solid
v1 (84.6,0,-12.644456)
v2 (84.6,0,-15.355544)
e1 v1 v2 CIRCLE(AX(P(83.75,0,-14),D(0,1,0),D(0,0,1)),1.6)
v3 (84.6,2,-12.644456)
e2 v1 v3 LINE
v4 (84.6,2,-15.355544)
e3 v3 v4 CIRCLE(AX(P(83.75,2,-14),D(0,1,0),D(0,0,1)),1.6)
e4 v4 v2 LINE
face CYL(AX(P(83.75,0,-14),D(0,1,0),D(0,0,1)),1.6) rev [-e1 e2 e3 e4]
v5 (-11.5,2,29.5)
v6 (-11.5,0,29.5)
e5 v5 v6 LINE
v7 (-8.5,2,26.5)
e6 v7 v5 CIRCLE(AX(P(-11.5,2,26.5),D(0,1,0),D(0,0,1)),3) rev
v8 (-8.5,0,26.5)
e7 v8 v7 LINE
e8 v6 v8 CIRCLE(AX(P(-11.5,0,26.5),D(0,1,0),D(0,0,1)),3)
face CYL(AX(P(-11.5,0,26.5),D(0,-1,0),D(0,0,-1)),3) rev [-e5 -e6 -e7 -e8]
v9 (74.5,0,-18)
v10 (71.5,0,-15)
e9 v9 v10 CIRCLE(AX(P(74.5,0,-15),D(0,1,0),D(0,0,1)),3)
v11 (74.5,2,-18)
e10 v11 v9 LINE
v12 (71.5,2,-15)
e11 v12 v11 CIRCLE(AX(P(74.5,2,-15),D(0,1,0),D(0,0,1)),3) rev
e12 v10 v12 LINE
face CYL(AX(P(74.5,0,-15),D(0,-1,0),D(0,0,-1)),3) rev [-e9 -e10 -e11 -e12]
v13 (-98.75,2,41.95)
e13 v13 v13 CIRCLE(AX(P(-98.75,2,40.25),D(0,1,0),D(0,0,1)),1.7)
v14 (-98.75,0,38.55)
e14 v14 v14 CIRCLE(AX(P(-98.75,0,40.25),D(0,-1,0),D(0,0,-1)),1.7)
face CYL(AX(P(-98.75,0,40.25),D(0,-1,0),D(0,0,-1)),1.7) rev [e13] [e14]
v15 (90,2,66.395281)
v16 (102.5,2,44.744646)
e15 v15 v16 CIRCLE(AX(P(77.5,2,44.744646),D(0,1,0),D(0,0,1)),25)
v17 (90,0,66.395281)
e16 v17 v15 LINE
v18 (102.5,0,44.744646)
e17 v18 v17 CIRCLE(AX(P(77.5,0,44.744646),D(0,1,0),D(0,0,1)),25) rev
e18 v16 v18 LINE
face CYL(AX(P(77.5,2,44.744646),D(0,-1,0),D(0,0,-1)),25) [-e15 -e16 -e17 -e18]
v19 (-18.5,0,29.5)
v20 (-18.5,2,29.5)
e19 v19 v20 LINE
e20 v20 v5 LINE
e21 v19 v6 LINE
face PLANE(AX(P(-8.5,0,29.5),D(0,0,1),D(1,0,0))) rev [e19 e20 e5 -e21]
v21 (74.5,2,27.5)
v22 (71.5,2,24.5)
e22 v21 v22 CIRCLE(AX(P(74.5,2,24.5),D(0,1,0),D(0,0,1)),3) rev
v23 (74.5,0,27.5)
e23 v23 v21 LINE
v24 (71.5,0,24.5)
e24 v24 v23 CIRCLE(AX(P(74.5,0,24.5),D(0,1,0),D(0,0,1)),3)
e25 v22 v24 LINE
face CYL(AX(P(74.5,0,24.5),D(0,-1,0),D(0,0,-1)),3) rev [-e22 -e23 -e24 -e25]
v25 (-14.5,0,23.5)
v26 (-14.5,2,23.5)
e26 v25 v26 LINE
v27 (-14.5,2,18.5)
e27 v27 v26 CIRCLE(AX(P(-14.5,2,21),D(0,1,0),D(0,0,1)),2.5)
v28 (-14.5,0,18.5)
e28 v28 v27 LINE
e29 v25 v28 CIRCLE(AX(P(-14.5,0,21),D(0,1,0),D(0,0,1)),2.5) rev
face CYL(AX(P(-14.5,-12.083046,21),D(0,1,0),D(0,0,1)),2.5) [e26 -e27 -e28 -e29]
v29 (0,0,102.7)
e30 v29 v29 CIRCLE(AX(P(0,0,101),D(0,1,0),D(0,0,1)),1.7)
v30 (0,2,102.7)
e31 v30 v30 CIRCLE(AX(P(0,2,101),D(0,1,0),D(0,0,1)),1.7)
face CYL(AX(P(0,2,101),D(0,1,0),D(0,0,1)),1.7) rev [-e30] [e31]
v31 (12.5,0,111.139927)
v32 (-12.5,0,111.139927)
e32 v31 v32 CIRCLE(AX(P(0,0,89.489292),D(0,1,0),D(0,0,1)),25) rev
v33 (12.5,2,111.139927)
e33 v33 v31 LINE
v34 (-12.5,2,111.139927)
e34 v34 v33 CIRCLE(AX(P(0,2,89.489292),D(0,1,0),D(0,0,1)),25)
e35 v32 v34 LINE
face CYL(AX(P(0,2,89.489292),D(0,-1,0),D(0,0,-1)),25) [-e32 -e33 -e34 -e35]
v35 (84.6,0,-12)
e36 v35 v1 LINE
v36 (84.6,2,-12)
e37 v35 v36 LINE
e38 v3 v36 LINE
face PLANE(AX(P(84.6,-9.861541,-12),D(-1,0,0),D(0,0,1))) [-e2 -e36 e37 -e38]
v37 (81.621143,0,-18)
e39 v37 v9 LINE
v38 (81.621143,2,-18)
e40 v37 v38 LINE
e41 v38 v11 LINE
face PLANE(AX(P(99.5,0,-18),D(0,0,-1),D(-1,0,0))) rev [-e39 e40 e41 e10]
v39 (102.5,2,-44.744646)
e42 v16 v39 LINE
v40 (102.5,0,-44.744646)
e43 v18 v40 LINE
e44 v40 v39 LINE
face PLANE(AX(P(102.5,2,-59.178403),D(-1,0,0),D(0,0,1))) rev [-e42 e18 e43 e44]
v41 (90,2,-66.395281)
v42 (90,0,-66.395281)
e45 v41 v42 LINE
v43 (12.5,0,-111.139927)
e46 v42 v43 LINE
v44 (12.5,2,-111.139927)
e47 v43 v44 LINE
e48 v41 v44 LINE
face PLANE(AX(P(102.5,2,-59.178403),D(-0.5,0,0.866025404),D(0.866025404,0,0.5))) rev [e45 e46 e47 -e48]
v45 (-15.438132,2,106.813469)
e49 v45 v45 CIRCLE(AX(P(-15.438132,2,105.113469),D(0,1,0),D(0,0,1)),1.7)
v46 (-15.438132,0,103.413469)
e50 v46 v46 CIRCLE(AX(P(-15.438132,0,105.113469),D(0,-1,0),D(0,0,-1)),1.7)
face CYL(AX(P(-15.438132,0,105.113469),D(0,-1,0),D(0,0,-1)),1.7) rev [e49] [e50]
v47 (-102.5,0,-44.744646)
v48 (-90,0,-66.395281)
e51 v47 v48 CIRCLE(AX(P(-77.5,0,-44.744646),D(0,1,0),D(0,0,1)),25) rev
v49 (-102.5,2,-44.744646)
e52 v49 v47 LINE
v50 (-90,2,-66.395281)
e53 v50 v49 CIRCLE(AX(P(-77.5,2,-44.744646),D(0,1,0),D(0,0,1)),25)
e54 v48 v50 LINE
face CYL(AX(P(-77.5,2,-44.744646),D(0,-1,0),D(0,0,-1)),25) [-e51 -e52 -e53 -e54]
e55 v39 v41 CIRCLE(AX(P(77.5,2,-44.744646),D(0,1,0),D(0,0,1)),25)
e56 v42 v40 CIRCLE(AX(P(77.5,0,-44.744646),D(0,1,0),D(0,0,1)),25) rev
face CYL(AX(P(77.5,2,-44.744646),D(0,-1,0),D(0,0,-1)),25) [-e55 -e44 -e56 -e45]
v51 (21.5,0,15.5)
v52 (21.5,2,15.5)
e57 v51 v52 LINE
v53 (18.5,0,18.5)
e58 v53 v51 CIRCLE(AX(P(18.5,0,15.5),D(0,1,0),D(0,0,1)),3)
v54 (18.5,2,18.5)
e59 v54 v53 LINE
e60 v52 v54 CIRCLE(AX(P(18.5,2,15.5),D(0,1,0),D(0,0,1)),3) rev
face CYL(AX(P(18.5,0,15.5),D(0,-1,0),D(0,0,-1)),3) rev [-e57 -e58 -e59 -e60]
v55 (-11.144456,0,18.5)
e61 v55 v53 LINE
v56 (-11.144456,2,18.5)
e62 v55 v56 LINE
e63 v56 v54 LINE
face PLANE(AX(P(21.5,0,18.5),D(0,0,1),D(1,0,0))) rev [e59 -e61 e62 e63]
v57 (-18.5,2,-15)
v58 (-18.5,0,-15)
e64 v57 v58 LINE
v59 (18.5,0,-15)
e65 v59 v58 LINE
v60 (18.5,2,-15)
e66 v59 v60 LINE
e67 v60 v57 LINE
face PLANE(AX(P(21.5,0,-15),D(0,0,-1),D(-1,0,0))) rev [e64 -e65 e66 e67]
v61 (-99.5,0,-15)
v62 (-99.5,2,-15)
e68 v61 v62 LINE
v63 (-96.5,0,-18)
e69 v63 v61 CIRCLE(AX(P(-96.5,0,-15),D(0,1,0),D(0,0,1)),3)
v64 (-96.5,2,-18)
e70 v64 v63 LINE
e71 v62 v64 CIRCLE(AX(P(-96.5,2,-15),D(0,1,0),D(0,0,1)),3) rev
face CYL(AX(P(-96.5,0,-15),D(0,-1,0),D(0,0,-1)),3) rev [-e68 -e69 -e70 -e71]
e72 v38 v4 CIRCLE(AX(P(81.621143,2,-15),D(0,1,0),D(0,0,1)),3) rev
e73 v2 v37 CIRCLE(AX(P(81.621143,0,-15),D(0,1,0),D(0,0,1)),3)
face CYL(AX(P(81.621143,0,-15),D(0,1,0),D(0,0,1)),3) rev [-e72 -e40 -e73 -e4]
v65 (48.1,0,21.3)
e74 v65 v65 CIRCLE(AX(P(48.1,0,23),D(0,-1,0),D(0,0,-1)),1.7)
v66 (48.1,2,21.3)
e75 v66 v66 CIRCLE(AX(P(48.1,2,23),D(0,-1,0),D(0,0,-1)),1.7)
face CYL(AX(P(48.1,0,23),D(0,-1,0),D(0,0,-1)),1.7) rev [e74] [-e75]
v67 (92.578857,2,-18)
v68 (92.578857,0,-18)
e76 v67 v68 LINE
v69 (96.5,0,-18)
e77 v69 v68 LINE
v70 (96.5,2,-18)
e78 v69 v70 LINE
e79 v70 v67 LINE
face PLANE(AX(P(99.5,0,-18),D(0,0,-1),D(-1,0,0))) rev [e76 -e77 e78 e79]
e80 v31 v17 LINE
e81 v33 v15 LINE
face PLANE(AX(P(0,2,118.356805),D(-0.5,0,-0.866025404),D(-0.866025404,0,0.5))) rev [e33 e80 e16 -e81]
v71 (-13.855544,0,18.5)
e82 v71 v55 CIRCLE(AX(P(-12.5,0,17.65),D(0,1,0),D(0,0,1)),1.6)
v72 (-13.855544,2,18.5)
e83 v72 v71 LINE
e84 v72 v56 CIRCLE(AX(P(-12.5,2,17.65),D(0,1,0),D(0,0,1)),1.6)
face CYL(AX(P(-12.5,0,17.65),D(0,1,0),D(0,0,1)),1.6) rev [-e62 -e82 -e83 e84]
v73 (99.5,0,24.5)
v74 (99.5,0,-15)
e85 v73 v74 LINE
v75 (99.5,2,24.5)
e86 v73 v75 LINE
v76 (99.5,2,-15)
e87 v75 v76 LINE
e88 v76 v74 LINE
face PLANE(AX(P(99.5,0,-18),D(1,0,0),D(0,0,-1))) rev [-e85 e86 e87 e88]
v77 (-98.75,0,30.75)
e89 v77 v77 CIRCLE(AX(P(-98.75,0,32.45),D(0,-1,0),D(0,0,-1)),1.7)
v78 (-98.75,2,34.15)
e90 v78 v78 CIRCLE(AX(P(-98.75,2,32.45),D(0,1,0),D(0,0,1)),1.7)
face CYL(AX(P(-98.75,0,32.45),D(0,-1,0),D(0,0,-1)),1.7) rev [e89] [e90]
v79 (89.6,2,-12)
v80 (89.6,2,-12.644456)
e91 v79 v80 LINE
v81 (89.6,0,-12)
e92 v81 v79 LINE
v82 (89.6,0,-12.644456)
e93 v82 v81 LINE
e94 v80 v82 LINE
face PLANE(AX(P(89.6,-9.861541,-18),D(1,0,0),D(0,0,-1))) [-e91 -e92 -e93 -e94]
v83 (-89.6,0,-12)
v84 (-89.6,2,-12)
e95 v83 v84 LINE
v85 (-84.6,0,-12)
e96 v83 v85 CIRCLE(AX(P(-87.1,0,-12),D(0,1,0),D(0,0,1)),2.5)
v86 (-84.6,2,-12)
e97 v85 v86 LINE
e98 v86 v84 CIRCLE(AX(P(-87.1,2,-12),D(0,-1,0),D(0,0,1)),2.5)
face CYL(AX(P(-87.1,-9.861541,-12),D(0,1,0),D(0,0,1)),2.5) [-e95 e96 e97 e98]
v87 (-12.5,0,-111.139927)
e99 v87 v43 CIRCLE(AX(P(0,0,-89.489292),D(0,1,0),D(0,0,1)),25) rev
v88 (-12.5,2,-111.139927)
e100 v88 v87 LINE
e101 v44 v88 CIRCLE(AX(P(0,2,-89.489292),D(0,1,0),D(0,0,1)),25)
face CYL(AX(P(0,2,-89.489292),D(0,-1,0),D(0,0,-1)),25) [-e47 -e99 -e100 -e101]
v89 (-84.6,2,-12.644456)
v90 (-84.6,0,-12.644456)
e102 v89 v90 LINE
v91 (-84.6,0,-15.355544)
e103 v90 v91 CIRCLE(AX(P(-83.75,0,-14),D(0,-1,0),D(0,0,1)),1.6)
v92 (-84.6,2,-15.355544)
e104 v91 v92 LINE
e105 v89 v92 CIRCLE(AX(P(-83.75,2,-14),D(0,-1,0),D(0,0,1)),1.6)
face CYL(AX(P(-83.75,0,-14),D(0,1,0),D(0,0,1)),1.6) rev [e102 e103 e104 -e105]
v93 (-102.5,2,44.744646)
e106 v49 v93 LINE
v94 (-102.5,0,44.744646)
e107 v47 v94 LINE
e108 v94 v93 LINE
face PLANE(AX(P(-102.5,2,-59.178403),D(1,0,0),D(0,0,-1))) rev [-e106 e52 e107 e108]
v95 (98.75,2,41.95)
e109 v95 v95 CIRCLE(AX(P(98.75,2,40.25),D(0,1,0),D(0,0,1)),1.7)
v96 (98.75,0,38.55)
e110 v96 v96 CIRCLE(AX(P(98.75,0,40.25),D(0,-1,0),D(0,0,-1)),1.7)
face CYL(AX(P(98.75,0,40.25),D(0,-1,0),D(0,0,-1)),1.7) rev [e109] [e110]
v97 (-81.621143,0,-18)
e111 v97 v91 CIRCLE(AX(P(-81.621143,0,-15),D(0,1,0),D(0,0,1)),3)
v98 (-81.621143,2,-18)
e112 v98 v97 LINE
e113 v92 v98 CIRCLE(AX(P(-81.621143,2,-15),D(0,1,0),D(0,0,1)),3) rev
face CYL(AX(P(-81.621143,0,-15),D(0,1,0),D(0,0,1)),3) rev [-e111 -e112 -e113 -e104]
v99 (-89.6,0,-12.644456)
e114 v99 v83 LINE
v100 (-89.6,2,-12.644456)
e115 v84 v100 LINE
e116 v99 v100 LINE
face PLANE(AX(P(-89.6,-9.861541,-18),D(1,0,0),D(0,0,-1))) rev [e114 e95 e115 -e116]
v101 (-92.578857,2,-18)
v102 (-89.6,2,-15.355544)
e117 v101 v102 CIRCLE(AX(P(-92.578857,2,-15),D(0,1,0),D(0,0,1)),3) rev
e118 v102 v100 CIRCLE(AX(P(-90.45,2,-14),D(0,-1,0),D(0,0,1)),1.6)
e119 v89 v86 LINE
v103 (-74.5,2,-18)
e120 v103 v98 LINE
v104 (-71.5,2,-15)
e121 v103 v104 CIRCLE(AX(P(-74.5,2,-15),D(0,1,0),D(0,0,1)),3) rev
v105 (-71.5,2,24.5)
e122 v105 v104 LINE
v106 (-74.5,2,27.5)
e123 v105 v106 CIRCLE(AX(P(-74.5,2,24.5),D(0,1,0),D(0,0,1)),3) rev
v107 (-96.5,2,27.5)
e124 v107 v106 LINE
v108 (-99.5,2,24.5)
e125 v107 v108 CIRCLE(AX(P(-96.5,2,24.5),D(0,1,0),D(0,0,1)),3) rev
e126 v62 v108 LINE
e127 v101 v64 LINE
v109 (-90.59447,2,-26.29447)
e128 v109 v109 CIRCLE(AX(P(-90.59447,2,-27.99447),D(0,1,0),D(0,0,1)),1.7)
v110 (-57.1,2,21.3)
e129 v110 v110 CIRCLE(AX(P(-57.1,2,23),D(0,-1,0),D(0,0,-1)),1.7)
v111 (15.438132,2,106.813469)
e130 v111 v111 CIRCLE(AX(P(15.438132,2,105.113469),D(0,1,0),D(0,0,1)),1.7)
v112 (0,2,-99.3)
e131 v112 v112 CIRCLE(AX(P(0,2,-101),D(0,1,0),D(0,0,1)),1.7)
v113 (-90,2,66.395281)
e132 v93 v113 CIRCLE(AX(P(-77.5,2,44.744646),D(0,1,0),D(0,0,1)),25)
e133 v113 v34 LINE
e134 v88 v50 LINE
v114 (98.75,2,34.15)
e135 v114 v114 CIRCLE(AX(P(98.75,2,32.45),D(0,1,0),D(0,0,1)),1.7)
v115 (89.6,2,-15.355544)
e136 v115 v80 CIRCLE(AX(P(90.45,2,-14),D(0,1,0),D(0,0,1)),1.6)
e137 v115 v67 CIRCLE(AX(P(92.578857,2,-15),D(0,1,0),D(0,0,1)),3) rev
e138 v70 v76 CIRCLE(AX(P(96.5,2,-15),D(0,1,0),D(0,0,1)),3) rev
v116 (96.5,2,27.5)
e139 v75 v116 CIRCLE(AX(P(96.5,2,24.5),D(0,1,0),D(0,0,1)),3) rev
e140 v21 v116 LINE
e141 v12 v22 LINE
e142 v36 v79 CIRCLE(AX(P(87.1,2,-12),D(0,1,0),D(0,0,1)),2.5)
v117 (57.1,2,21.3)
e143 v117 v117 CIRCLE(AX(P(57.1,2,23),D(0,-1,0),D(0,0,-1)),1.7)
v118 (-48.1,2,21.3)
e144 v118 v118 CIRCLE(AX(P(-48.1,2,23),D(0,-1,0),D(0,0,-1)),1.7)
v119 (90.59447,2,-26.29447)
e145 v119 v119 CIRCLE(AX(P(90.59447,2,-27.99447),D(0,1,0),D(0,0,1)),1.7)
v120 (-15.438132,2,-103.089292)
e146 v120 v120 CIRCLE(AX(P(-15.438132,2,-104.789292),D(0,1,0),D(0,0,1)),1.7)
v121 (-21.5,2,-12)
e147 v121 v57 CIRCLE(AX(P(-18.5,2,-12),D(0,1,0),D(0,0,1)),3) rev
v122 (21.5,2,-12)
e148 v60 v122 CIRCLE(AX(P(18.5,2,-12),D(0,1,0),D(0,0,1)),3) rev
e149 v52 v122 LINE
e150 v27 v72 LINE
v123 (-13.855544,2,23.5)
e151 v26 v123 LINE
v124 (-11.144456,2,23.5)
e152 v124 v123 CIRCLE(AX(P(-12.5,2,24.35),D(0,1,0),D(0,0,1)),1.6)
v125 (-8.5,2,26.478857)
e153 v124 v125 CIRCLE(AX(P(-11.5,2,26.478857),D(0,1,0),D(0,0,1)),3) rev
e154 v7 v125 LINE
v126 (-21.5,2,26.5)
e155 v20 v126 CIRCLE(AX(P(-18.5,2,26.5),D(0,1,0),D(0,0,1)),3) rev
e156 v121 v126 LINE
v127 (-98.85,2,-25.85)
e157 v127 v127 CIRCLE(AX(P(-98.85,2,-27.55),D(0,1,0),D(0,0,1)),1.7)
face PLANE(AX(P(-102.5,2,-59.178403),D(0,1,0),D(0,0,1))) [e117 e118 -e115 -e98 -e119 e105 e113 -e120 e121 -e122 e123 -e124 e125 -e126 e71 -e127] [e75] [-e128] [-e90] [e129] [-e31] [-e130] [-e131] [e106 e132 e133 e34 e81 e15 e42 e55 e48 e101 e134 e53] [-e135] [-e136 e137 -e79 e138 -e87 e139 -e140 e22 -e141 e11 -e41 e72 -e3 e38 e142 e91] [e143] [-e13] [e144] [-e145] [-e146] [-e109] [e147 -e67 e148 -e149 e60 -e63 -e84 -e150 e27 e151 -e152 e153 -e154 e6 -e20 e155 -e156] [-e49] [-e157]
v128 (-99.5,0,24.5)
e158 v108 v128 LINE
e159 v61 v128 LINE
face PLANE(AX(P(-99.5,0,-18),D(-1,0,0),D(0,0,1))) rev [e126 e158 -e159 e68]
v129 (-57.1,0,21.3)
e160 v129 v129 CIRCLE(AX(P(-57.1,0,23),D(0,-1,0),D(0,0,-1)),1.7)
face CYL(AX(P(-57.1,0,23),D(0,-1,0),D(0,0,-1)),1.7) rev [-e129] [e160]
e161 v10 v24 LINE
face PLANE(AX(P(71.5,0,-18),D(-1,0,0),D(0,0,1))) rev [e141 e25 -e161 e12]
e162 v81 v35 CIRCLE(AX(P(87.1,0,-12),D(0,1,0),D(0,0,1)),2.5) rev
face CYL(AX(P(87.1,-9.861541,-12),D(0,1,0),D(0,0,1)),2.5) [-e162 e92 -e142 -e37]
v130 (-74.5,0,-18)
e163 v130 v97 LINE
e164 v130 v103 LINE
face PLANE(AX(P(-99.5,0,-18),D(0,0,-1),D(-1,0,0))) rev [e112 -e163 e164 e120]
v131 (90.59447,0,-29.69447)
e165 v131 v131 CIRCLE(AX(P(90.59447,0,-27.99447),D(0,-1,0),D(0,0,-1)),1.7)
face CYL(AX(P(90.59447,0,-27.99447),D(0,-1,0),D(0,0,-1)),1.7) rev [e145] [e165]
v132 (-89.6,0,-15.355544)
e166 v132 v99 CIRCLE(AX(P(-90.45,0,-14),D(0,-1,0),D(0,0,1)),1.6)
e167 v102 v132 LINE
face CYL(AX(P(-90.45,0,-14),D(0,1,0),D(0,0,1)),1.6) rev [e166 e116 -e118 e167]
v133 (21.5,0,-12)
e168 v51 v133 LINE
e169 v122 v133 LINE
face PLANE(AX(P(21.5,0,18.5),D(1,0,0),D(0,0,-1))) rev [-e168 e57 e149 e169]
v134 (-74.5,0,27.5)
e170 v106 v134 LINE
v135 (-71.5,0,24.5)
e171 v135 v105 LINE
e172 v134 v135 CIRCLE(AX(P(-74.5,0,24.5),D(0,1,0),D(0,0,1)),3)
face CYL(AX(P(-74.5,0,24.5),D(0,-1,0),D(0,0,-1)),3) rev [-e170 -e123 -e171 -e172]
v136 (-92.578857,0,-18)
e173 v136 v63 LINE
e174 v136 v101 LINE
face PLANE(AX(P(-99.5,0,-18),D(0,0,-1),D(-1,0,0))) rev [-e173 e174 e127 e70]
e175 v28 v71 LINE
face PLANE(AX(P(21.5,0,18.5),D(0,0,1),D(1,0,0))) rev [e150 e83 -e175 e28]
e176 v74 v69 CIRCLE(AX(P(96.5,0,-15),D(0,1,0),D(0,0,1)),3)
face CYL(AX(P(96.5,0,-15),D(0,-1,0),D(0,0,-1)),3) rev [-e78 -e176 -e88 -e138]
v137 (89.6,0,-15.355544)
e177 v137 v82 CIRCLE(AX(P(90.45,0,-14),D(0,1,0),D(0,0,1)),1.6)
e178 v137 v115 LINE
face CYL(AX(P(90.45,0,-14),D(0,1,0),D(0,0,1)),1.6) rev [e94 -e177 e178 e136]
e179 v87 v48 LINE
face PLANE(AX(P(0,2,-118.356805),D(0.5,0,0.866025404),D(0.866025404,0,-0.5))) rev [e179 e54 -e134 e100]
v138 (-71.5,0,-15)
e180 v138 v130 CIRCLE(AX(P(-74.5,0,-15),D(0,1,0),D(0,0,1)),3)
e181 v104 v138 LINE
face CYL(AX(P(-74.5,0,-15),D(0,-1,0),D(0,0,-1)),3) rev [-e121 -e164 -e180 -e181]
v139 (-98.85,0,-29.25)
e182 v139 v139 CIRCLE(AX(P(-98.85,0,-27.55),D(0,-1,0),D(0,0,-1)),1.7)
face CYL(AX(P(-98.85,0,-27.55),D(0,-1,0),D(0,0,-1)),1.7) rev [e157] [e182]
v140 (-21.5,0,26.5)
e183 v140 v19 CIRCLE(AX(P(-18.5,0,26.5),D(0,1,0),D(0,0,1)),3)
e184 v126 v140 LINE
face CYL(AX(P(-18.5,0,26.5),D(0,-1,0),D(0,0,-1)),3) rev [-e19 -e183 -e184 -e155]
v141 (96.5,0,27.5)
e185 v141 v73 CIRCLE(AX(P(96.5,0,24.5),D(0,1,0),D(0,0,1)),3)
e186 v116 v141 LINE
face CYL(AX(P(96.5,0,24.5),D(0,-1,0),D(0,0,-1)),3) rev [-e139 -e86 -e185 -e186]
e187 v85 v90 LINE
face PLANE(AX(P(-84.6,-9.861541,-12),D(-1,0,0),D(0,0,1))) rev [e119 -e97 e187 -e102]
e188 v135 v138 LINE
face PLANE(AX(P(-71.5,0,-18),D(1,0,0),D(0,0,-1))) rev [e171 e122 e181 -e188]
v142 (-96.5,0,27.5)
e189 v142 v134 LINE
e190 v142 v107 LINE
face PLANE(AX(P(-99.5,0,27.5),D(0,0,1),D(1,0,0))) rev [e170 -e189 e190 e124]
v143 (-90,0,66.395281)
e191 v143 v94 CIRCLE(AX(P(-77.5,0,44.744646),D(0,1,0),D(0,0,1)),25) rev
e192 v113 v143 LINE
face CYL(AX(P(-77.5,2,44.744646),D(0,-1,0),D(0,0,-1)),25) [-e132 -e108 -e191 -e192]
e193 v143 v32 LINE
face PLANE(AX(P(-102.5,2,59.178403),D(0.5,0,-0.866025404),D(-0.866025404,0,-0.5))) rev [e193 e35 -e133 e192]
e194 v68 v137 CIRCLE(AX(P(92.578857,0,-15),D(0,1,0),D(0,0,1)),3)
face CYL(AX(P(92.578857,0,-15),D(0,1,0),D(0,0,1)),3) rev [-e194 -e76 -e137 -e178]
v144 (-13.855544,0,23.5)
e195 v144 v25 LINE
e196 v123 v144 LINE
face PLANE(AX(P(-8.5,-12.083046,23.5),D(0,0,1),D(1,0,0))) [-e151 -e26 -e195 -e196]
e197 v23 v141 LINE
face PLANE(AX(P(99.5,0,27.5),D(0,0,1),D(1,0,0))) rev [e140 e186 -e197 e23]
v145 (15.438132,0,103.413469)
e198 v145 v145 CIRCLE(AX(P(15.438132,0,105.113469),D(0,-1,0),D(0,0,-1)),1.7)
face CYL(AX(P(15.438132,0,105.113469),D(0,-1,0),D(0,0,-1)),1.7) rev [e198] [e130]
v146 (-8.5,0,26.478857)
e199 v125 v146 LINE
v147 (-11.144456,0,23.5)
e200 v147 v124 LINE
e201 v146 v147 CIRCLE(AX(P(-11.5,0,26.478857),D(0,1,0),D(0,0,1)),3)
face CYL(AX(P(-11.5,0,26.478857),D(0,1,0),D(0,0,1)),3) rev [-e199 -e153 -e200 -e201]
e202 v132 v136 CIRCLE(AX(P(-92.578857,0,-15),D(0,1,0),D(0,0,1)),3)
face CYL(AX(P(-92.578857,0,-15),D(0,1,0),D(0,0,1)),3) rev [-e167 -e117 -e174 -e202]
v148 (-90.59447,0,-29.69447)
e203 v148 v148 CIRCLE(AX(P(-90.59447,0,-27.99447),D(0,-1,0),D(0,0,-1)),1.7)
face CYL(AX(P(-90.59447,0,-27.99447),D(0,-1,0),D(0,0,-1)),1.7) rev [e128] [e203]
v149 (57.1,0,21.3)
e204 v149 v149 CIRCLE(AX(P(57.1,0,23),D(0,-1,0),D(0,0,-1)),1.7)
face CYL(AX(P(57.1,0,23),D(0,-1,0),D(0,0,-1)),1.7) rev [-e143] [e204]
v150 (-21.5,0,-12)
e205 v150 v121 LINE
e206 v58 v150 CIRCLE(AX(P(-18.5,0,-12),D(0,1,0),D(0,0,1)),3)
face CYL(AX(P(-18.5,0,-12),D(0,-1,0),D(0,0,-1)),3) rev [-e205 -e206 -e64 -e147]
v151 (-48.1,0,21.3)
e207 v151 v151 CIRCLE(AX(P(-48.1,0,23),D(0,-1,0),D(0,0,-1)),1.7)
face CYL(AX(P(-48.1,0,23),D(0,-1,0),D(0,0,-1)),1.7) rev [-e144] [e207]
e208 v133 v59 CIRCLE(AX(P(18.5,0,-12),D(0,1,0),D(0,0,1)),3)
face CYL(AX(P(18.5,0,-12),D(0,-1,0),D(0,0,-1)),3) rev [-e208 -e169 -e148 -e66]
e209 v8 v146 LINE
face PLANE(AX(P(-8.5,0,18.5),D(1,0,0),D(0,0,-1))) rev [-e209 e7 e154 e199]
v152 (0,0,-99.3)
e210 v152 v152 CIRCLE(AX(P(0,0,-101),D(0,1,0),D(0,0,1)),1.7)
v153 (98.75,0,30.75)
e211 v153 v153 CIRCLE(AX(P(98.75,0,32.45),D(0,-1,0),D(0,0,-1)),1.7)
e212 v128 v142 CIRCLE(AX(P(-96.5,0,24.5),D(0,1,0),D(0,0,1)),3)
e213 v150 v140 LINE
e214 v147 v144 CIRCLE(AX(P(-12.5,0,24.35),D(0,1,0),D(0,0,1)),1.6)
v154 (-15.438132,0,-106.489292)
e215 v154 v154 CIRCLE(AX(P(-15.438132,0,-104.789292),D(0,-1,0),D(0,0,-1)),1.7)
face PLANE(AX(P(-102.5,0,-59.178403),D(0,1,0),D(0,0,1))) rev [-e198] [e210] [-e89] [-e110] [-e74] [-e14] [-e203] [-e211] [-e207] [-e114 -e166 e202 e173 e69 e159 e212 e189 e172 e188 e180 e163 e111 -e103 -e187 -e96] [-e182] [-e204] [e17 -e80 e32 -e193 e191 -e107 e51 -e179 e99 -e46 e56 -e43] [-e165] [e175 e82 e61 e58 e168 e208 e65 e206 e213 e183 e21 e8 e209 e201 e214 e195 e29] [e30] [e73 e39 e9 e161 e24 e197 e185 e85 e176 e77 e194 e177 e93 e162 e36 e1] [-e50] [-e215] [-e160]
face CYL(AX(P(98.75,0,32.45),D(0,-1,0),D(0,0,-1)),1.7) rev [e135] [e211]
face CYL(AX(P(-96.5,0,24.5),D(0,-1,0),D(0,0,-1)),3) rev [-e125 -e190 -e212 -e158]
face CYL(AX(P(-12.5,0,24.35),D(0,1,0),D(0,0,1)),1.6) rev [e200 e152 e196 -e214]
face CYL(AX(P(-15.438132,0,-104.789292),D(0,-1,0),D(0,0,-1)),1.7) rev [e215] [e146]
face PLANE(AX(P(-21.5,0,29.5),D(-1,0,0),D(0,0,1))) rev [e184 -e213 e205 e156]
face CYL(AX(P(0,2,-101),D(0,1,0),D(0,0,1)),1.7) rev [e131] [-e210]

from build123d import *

# Parameters (mm, degrees)
BOSS_EXTRU_1_DEPTH                  = 2
ESQUISSE2_W                         = 28
ESQUISSE2_H                         = 45.5
ENL_V_MAT_EXTRU_1_DEPTH             = 157.584109453
BOSS_EXTRU_2_DEPTH                  = 2
ESQUISSE11_R                        = 1.6
ENL_V_MAT_EXTRU_2_DEPTH             = 157.584109453
CONG_7_R                            = 3
CONG_8_R                            = 25
DIAM_TRE_DU_PER_AGE_3_4_3_4_2_D     = 3.4
DIAM_TRE_DU_PER_AGE_3_4_3_4_2_DEPTH = 3
DIAM_TRE_DU_PER_AGE_3_4_3_4_2_TIP   = 1.021463052
D_GAGEMENT_M31_D                    = 3.4
D_GAGEMENT_M33_D                    = 3.4
D_GAGEMENT_M33_DEPTH                = 7
D_GAGEMENT_M33_TIP                  = 1.021463052
ENL_V_MAT_EXTRU_3_DEPTH             = 154.681644706
BOSS_EXTRU_3_DEPTH                  = 2
ESQUISSE40_R                        = 1.6
ENL_V_MAT_EXTRU_4_DEPTH             = 154.681644706
CONG_9_R                            = 3


with BuildPart() as part:
    # Esquisse1 → Boss.-Extru.1 (new body)
    with BuildSketch(Plane(origin=(0, 0, 0), x_dir=(1, 0, 0), z_dir=(0, 1, 0))):
        Polygon((-102.5, 59.178402592), (-102.5, -59.178402592), (0, -118.356805184), (102.5, -59.178402592), (102.5, 59.178402592), (0, 118.356805184), align=None)
    extrude(amount=BOSS_EXTRU_1_DEPTH)

    # Esquisse2 → Enlèv. mat.-Extru.1 (cut, through all)
    with BuildSketch(Plane(origin=(0, 2, 0), x_dir=(1, 0, 0), z_dir=(0, 1, 0))):
        with Locations((-85.5, -4.75)):
            Rectangle(ESQUISSE2_W, ESQUISSE2_H)
        with Locations((85.5, -4.75)):
            Rectangle(ESQUISSE2_W, ESQUISSE2_H)
    extrude(amount=-ENL_V_MAT_EXTRU_1_DEPTH, mode=Mode.SUBTRACT)

    # Esquisse10 → Boss.-Extru.2 (add)
    with BuildSketch(Plane(origin=(0, 2, 0), x_dir=(1, 0, 0), z_dir=(0, 1, 0))):
        with BuildLine():
            Line((89.6, 18), (89.6, 12))
            ThreePointArc((89.6, 12), (87.1, 9.5), (84.6, 12))
            Line((84.6, 12), (84.6, 18))
            Line((84.6, 18), (89.6, 18))
        make_face()
    boss_extru_2 = extrude(amount=-BOSS_EXTRU_2_DEPTH)

    # Esquisse11 → Enlèv. mat.-Extru.2 (cut, through all)
    with BuildSketch(Plane(origin=(0, 2, 0), x_dir=(1, 0, 0), z_dir=(0, 1, 0))):
        with Locations((83.75, 14)):
            Circle(ESQUISSE11_R)
        with Locations((90.45, 14)):
            Circle(ESQUISSE11_R)
    enl_v_mat_extru_2 = extrude(amount=-ENL_V_MAT_EXTRU_2_DEPTH, mode=Mode.SUBTRACT)

    # Symétrie4: Boss.-Extru.2, Enlèv. mat.-Extru.2 across plane
    add(boss_extru_2.mirror(Plane(origin=(0, 0, 0), x_dir=(0, 0, 1), z_dir=(1, 0, 0))))
    add(enl_v_mat_extru_2.mirror(Plane(origin=(0, 0, 0), x_dir=(0, 0, 1), z_dir=(1, 0, 0))), mode=Mode.SUBTRACT)

    # Congé7
    # the kernel refuses this fillet: 3 mm, written as the material it adds along each edge
    with BuildSketch(Plane(origin=(-89.6, 2, -18), x_dir=(0, 0, 1), z_dir=(0, -1, 0)), Plane(origin=(84.6, 2, -18), x_dir=(0, 0, 1), z_dir=(0, -1, 0))) as cong_7_piece_1:
        with BuildLine():
            CenterArc((3, 2.978856885), CONG_7_R, 180, 83.193609184)
            Line((0, 2.978856885), (-0.06, 2.978856885))
            Line((-0.06, 2.978856885), (-0.06, 0))
            Line((-0.06, 0), (0, -0.06))
            ThreePointArc((0, -0.06), (1.322227914, -0.06), (2.637344945, -0.059577138))
            Line((2.637344945, -0.059577138), (2.644455829, 0))
        make_face()
    extrude(amount=2)
    with BuildSketch(Plane(origin=(-71.5, 2, -18), x_dir=(0, 0, 1), z_dir=(0, -1, 0)), Plane(origin=(71.5, 2, -18), x_dir=(1, 0, 0), z_dir=(0, -1, 0)), Plane(origin=(-99.5, 2, -18), x_dir=(1, 0, 0), z_dir=(0, -1, 0)), Plane(origin=(-99.5, 2, 27.5), x_dir=(0, 0, -1), z_dir=(0, -1, 0)), Plane(origin=(99.5, 2, 27.5), x_dir=(-1, 0, 0), z_dir=(0, -1, 0)), Plane(origin=(99.5, 2, -18), x_dir=(0, 0, 1), z_dir=(0, -1, 0))) as cong_7_piece_2:
        with BuildLine():
            CenterArc((CONG_7_R, CONG_7_R), CONG_7_R, 180, 90)
            Line((0, CONG_7_R), (-CONG_7_R * 0.02, CONG_7_R))
            Line((-CONG_7_R * 0.02, CONG_7_R), (-CONG_7_R * 0.02, -CONG_7_R * 0.02))
            Line((-CONG_7_R * 0.02, -CONG_7_R * 0.02), (CONG_7_R, -CONG_7_R * 0.02))
            Line((CONG_7_R, -CONG_7_R * 0.02), (CONG_7_R, 0))
        make_face()
    extrude(amount=2)
    with BuildSketch(Plane(origin=(-84.6, 2, -18), x_dir=(1, 0, 0), z_dir=(0, -1, 0)), Plane(origin=(89.6, 2, -18), x_dir=(1, 0, 0), z_dir=(0, -1, 0))) as cong_7_piece_3:
        with BuildLine():
            CenterArc((2.978856885, 3), CONG_7_R, 186.806390816, 83.193609184)
            Line((0, 2.644455829), (-0.059577138, 2.637344945))
            ThreePointArc((-0.059577138, 2.637344945), (-0.06, 1.322227914), (-0.06, 0))
            Line((-0.06, 0), (0, -0.06))
            Line((0, -0.06), (2.978856885, -0.06))
            Line((2.978856885, -0.06), (2.978856885, 0))
        make_face()
    extrude(amount=2)
    with BuildSketch(Plane(origin=(-71.5, 2, 27.5), x_dir=(0, 0, -1), z_dir=(0, -1, 0)), Plane(origin=(71.5, 2, 27.5), x_dir=(1, 0, 0), z_dir=(0, -1, 0))) as cong_7_piece_4:
        with BuildLine():
            CenterArc((CONG_7_R, -CONG_7_R), CONG_7_R, 90, 90)
            Line((0, -CONG_7_R), (-CONG_7_R * 0.02, -CONG_7_R))
            Line((-CONG_7_R * 0.02, -CONG_7_R), (-CONG_7_R * 0.02, CONG_7_R * 0.02))
            Line((-CONG_7_R * 0.02, CONG_7_R * 0.02), (CONG_7_R, CONG_7_R * 0.02))
            Line((CONG_7_R, CONG_7_R * 0.02), (CONG_7_R, 0))
        make_face()
    extrude(amount=2)

    # Congé8
    cong_8_edges = [part.edges().sort_by_distance(p)[0] for p in [
        (0, 1, -118.356805184),
        (102.5, 1, -59.178402592),
        (102.5, 1, 59.178402592),
        (0, 1, 118.356805184),
        (-102.5, 1, 59.178402592),
        (-102.5, 1, -59.178402592),
    ]]
    fillet(cong_8_edges, radius=CONG_8_R)

    # Diamètre du perçage Ø3.4 (3.4)2
    with Locations(Plane(origin=(0, 2, 0), x_dir=(-1, 0, 0), z_dir=(0, 1, 0))):
        with Locations((0, -101), (0, 101)):
            Hole(DIAM_TRE_DU_PER_AGE_3_4_3_4_2_D / 2, depth=DIAM_TRE_DU_PER_AGE_3_4_3_4_2_DEPTH)
            with Locations((0, 0, -(DIAM_TRE_DU_PER_AGE_3_4_3_4_2_DEPTH + DIAM_TRE_DU_PER_AGE_3_4_3_4_2_TIP / 2))):  # 118° drill point
                Cone(0, DIAM_TRE_DU_PER_AGE_3_4_3_4_2_D / 2, DIAM_TRE_DU_PER_AGE_3_4_3_4_2_TIP, mode=Mode.SUBTRACT)

    # Dégagement M31 (through all)
    with Locations(Plane(origin=(0, 0, 0), x_dir=(-1, 0, 0), z_dir=(0, -1, 0))):
        with Locations((48.1, -23), (57.1, -23), (-57.1, -23), (-48.1, -23)):
            Hole(D_GAGEMENT_M31_D / 2)

    # Dégagement M33
    with Locations(Plane(origin=(0, 0, 0), x_dir=(-1, 0, 0), z_dir=(0, -1, 0))):
        with Locations((15.43813191, -105.113468551), (-15.43813191, -105.113468551), (-98.75, -40.25), (-98.75, -32.45), (-90.594469683, 27.994469683), (15.43813191, 104.789291724), (98.85, 27.55), (90.594469683, 27.994469683), (98.75, -40.25), (98.75, -32.45)):
            Hole(D_GAGEMENT_M33_D / 2, depth=D_GAGEMENT_M33_DEPTH)
            with Locations((0, 0, -(D_GAGEMENT_M33_DEPTH + D_GAGEMENT_M33_TIP / 2))):  # 118° drill point
                Cone(0, D_GAGEMENT_M33_D / 2, D_GAGEMENT_M33_TIP, mode=Mode.SUBTRACT)

    # Esquisse38 → Enlèv. mat.-Extru.3 (cut, through all)
    with BuildSketch(Plane(origin=(0, 2, 0), x_dir=(1, 0, 0), z_dir=(0, 1, 0))):
        Polygon((21.5, -18.5), (-8.5, -18.5), (-8.5, -29.5), (-21.5, -29.5), (-21.5, 15), (21.5, 15), align=None)
    extrude(amount=-ENL_V_MAT_EXTRU_3_DEPTH, mode=Mode.SUBTRACT)

    # Esquisse39 → Boss.-Extru.3 (add)
    with BuildSketch(Plane(origin=(0, 2, 0), x_dir=(1, 0, 0), z_dir=(0, 1, 0))):
        with BuildLine():
            Line((-8.5, -23.5), (-14.5, -23.5))
            ThreePointArc((-14.5, -23.5), (-17, -21), (-14.5, -18.5))
            Line((-14.5, -18.5), (-8.5, -18.5))
            ThreePointArc((-8.5, -18.5), (-6, -21), (-8.5, -23.5))
        make_face()
    extrude(amount=-BOSS_EXTRU_3_DEPTH)

    # Esquisse40 → Enlèv. mat.-Extru.4 (cut, through all)
    with BuildSketch(Plane(origin=(0, 2, 0), x_dir=(1, 0, 0), z_dir=(0, 1, 0))):
        with Locations((-12.5, -17.65)):
            Circle(ESQUISSE40_R)
        with Locations((-12.5, -24.35)):
            Circle(ESQUISSE40_R)
    extrude(amount=-ENL_V_MAT_EXTRU_4_DEPTH, mode=Mode.SUBTRACT)

    # Congé9
    # the kernel refuses this fillet: 3 mm, written as the material it adds along each edge
    with BuildSketch(Plane(origin=(21.5, 2, 18.5), x_dir=(-1, 0, 0), z_dir=(0, -1, 0)), Plane(origin=(21.5, 2, -15), x_dir=(0, 0, 1), z_dir=(0, -1, 0)), Plane(origin=(-21.5, 2, 29.5), x_dir=(0, 0, -1), z_dir=(0, -1, 0)), Plane(origin=(-8.5, 2, 29.5), x_dir=(-1, 0, 0), z_dir=(0, -1, 0))) as cong_9_piece_1:
        with BuildLine():
            CenterArc((CONG_9_R, CONG_9_R), CONG_9_R, 180, 90)
            Line((0, CONG_9_R), (-CONG_9_R * 0.02, CONG_9_R))
            Line((-CONG_9_R * 0.02, CONG_9_R), (-CONG_9_R * 0.02, -CONG_9_R * 0.02))
            Line((-CONG_9_R * 0.02, -CONG_9_R * 0.02), (CONG_9_R, -CONG_9_R * 0.02))
            Line((CONG_9_R, -CONG_9_R * 0.02), (CONG_9_R, 0))
        make_face()
    extrude(amount=2)
    with BuildSketch(Plane(origin=(-21.5, 2, -15), x_dir=(0, 0, 1), z_dir=(0, -1, 0))) as cong_9_piece_2:
        with BuildLine():
            CenterArc((CONG_9_R, -CONG_9_R), CONG_9_R, 90, 90)
            Line((0, -CONG_9_R), (-CONG_9_R * 0.02, -CONG_9_R))
            Line((-CONG_9_R * 0.02, -CONG_9_R), (-CONG_9_R * 0.02, CONG_9_R * 0.02))
            Line((-CONG_9_R * 0.02, CONG_9_R * 0.02), (CONG_9_R, CONG_9_R * 0.02))
            Line((CONG_9_R, CONG_9_R * 0.02), (CONG_9_R, 0))
        make_face()
    extrude(amount=2)
    with BuildSketch(Plane(origin=(-8.5, 2, 23.5), x_dir=(0, 0, 1), z_dir=(0, -1, 0))) as cong_9_piece_3:
        with BuildLine():
            CenterArc((2.978856885, 3), CONG_9_R, 186.806390816, 83.193609184)
            Line((0, 2.644455829), (-0.059577138, 2.637344945))
            ThreePointArc((-0.059577138, 2.637344945), (-0.06, 1.322227914), (-0.06, 0))
            Line((-0.06, 0), (0, -0.06))
            Line((0, -0.06), (2.978856885, -0.06))
            Line((2.978856885, -0.06), (2.978856885, 0))
        make_face()
    extrude(amount=2)


solid = part.part
